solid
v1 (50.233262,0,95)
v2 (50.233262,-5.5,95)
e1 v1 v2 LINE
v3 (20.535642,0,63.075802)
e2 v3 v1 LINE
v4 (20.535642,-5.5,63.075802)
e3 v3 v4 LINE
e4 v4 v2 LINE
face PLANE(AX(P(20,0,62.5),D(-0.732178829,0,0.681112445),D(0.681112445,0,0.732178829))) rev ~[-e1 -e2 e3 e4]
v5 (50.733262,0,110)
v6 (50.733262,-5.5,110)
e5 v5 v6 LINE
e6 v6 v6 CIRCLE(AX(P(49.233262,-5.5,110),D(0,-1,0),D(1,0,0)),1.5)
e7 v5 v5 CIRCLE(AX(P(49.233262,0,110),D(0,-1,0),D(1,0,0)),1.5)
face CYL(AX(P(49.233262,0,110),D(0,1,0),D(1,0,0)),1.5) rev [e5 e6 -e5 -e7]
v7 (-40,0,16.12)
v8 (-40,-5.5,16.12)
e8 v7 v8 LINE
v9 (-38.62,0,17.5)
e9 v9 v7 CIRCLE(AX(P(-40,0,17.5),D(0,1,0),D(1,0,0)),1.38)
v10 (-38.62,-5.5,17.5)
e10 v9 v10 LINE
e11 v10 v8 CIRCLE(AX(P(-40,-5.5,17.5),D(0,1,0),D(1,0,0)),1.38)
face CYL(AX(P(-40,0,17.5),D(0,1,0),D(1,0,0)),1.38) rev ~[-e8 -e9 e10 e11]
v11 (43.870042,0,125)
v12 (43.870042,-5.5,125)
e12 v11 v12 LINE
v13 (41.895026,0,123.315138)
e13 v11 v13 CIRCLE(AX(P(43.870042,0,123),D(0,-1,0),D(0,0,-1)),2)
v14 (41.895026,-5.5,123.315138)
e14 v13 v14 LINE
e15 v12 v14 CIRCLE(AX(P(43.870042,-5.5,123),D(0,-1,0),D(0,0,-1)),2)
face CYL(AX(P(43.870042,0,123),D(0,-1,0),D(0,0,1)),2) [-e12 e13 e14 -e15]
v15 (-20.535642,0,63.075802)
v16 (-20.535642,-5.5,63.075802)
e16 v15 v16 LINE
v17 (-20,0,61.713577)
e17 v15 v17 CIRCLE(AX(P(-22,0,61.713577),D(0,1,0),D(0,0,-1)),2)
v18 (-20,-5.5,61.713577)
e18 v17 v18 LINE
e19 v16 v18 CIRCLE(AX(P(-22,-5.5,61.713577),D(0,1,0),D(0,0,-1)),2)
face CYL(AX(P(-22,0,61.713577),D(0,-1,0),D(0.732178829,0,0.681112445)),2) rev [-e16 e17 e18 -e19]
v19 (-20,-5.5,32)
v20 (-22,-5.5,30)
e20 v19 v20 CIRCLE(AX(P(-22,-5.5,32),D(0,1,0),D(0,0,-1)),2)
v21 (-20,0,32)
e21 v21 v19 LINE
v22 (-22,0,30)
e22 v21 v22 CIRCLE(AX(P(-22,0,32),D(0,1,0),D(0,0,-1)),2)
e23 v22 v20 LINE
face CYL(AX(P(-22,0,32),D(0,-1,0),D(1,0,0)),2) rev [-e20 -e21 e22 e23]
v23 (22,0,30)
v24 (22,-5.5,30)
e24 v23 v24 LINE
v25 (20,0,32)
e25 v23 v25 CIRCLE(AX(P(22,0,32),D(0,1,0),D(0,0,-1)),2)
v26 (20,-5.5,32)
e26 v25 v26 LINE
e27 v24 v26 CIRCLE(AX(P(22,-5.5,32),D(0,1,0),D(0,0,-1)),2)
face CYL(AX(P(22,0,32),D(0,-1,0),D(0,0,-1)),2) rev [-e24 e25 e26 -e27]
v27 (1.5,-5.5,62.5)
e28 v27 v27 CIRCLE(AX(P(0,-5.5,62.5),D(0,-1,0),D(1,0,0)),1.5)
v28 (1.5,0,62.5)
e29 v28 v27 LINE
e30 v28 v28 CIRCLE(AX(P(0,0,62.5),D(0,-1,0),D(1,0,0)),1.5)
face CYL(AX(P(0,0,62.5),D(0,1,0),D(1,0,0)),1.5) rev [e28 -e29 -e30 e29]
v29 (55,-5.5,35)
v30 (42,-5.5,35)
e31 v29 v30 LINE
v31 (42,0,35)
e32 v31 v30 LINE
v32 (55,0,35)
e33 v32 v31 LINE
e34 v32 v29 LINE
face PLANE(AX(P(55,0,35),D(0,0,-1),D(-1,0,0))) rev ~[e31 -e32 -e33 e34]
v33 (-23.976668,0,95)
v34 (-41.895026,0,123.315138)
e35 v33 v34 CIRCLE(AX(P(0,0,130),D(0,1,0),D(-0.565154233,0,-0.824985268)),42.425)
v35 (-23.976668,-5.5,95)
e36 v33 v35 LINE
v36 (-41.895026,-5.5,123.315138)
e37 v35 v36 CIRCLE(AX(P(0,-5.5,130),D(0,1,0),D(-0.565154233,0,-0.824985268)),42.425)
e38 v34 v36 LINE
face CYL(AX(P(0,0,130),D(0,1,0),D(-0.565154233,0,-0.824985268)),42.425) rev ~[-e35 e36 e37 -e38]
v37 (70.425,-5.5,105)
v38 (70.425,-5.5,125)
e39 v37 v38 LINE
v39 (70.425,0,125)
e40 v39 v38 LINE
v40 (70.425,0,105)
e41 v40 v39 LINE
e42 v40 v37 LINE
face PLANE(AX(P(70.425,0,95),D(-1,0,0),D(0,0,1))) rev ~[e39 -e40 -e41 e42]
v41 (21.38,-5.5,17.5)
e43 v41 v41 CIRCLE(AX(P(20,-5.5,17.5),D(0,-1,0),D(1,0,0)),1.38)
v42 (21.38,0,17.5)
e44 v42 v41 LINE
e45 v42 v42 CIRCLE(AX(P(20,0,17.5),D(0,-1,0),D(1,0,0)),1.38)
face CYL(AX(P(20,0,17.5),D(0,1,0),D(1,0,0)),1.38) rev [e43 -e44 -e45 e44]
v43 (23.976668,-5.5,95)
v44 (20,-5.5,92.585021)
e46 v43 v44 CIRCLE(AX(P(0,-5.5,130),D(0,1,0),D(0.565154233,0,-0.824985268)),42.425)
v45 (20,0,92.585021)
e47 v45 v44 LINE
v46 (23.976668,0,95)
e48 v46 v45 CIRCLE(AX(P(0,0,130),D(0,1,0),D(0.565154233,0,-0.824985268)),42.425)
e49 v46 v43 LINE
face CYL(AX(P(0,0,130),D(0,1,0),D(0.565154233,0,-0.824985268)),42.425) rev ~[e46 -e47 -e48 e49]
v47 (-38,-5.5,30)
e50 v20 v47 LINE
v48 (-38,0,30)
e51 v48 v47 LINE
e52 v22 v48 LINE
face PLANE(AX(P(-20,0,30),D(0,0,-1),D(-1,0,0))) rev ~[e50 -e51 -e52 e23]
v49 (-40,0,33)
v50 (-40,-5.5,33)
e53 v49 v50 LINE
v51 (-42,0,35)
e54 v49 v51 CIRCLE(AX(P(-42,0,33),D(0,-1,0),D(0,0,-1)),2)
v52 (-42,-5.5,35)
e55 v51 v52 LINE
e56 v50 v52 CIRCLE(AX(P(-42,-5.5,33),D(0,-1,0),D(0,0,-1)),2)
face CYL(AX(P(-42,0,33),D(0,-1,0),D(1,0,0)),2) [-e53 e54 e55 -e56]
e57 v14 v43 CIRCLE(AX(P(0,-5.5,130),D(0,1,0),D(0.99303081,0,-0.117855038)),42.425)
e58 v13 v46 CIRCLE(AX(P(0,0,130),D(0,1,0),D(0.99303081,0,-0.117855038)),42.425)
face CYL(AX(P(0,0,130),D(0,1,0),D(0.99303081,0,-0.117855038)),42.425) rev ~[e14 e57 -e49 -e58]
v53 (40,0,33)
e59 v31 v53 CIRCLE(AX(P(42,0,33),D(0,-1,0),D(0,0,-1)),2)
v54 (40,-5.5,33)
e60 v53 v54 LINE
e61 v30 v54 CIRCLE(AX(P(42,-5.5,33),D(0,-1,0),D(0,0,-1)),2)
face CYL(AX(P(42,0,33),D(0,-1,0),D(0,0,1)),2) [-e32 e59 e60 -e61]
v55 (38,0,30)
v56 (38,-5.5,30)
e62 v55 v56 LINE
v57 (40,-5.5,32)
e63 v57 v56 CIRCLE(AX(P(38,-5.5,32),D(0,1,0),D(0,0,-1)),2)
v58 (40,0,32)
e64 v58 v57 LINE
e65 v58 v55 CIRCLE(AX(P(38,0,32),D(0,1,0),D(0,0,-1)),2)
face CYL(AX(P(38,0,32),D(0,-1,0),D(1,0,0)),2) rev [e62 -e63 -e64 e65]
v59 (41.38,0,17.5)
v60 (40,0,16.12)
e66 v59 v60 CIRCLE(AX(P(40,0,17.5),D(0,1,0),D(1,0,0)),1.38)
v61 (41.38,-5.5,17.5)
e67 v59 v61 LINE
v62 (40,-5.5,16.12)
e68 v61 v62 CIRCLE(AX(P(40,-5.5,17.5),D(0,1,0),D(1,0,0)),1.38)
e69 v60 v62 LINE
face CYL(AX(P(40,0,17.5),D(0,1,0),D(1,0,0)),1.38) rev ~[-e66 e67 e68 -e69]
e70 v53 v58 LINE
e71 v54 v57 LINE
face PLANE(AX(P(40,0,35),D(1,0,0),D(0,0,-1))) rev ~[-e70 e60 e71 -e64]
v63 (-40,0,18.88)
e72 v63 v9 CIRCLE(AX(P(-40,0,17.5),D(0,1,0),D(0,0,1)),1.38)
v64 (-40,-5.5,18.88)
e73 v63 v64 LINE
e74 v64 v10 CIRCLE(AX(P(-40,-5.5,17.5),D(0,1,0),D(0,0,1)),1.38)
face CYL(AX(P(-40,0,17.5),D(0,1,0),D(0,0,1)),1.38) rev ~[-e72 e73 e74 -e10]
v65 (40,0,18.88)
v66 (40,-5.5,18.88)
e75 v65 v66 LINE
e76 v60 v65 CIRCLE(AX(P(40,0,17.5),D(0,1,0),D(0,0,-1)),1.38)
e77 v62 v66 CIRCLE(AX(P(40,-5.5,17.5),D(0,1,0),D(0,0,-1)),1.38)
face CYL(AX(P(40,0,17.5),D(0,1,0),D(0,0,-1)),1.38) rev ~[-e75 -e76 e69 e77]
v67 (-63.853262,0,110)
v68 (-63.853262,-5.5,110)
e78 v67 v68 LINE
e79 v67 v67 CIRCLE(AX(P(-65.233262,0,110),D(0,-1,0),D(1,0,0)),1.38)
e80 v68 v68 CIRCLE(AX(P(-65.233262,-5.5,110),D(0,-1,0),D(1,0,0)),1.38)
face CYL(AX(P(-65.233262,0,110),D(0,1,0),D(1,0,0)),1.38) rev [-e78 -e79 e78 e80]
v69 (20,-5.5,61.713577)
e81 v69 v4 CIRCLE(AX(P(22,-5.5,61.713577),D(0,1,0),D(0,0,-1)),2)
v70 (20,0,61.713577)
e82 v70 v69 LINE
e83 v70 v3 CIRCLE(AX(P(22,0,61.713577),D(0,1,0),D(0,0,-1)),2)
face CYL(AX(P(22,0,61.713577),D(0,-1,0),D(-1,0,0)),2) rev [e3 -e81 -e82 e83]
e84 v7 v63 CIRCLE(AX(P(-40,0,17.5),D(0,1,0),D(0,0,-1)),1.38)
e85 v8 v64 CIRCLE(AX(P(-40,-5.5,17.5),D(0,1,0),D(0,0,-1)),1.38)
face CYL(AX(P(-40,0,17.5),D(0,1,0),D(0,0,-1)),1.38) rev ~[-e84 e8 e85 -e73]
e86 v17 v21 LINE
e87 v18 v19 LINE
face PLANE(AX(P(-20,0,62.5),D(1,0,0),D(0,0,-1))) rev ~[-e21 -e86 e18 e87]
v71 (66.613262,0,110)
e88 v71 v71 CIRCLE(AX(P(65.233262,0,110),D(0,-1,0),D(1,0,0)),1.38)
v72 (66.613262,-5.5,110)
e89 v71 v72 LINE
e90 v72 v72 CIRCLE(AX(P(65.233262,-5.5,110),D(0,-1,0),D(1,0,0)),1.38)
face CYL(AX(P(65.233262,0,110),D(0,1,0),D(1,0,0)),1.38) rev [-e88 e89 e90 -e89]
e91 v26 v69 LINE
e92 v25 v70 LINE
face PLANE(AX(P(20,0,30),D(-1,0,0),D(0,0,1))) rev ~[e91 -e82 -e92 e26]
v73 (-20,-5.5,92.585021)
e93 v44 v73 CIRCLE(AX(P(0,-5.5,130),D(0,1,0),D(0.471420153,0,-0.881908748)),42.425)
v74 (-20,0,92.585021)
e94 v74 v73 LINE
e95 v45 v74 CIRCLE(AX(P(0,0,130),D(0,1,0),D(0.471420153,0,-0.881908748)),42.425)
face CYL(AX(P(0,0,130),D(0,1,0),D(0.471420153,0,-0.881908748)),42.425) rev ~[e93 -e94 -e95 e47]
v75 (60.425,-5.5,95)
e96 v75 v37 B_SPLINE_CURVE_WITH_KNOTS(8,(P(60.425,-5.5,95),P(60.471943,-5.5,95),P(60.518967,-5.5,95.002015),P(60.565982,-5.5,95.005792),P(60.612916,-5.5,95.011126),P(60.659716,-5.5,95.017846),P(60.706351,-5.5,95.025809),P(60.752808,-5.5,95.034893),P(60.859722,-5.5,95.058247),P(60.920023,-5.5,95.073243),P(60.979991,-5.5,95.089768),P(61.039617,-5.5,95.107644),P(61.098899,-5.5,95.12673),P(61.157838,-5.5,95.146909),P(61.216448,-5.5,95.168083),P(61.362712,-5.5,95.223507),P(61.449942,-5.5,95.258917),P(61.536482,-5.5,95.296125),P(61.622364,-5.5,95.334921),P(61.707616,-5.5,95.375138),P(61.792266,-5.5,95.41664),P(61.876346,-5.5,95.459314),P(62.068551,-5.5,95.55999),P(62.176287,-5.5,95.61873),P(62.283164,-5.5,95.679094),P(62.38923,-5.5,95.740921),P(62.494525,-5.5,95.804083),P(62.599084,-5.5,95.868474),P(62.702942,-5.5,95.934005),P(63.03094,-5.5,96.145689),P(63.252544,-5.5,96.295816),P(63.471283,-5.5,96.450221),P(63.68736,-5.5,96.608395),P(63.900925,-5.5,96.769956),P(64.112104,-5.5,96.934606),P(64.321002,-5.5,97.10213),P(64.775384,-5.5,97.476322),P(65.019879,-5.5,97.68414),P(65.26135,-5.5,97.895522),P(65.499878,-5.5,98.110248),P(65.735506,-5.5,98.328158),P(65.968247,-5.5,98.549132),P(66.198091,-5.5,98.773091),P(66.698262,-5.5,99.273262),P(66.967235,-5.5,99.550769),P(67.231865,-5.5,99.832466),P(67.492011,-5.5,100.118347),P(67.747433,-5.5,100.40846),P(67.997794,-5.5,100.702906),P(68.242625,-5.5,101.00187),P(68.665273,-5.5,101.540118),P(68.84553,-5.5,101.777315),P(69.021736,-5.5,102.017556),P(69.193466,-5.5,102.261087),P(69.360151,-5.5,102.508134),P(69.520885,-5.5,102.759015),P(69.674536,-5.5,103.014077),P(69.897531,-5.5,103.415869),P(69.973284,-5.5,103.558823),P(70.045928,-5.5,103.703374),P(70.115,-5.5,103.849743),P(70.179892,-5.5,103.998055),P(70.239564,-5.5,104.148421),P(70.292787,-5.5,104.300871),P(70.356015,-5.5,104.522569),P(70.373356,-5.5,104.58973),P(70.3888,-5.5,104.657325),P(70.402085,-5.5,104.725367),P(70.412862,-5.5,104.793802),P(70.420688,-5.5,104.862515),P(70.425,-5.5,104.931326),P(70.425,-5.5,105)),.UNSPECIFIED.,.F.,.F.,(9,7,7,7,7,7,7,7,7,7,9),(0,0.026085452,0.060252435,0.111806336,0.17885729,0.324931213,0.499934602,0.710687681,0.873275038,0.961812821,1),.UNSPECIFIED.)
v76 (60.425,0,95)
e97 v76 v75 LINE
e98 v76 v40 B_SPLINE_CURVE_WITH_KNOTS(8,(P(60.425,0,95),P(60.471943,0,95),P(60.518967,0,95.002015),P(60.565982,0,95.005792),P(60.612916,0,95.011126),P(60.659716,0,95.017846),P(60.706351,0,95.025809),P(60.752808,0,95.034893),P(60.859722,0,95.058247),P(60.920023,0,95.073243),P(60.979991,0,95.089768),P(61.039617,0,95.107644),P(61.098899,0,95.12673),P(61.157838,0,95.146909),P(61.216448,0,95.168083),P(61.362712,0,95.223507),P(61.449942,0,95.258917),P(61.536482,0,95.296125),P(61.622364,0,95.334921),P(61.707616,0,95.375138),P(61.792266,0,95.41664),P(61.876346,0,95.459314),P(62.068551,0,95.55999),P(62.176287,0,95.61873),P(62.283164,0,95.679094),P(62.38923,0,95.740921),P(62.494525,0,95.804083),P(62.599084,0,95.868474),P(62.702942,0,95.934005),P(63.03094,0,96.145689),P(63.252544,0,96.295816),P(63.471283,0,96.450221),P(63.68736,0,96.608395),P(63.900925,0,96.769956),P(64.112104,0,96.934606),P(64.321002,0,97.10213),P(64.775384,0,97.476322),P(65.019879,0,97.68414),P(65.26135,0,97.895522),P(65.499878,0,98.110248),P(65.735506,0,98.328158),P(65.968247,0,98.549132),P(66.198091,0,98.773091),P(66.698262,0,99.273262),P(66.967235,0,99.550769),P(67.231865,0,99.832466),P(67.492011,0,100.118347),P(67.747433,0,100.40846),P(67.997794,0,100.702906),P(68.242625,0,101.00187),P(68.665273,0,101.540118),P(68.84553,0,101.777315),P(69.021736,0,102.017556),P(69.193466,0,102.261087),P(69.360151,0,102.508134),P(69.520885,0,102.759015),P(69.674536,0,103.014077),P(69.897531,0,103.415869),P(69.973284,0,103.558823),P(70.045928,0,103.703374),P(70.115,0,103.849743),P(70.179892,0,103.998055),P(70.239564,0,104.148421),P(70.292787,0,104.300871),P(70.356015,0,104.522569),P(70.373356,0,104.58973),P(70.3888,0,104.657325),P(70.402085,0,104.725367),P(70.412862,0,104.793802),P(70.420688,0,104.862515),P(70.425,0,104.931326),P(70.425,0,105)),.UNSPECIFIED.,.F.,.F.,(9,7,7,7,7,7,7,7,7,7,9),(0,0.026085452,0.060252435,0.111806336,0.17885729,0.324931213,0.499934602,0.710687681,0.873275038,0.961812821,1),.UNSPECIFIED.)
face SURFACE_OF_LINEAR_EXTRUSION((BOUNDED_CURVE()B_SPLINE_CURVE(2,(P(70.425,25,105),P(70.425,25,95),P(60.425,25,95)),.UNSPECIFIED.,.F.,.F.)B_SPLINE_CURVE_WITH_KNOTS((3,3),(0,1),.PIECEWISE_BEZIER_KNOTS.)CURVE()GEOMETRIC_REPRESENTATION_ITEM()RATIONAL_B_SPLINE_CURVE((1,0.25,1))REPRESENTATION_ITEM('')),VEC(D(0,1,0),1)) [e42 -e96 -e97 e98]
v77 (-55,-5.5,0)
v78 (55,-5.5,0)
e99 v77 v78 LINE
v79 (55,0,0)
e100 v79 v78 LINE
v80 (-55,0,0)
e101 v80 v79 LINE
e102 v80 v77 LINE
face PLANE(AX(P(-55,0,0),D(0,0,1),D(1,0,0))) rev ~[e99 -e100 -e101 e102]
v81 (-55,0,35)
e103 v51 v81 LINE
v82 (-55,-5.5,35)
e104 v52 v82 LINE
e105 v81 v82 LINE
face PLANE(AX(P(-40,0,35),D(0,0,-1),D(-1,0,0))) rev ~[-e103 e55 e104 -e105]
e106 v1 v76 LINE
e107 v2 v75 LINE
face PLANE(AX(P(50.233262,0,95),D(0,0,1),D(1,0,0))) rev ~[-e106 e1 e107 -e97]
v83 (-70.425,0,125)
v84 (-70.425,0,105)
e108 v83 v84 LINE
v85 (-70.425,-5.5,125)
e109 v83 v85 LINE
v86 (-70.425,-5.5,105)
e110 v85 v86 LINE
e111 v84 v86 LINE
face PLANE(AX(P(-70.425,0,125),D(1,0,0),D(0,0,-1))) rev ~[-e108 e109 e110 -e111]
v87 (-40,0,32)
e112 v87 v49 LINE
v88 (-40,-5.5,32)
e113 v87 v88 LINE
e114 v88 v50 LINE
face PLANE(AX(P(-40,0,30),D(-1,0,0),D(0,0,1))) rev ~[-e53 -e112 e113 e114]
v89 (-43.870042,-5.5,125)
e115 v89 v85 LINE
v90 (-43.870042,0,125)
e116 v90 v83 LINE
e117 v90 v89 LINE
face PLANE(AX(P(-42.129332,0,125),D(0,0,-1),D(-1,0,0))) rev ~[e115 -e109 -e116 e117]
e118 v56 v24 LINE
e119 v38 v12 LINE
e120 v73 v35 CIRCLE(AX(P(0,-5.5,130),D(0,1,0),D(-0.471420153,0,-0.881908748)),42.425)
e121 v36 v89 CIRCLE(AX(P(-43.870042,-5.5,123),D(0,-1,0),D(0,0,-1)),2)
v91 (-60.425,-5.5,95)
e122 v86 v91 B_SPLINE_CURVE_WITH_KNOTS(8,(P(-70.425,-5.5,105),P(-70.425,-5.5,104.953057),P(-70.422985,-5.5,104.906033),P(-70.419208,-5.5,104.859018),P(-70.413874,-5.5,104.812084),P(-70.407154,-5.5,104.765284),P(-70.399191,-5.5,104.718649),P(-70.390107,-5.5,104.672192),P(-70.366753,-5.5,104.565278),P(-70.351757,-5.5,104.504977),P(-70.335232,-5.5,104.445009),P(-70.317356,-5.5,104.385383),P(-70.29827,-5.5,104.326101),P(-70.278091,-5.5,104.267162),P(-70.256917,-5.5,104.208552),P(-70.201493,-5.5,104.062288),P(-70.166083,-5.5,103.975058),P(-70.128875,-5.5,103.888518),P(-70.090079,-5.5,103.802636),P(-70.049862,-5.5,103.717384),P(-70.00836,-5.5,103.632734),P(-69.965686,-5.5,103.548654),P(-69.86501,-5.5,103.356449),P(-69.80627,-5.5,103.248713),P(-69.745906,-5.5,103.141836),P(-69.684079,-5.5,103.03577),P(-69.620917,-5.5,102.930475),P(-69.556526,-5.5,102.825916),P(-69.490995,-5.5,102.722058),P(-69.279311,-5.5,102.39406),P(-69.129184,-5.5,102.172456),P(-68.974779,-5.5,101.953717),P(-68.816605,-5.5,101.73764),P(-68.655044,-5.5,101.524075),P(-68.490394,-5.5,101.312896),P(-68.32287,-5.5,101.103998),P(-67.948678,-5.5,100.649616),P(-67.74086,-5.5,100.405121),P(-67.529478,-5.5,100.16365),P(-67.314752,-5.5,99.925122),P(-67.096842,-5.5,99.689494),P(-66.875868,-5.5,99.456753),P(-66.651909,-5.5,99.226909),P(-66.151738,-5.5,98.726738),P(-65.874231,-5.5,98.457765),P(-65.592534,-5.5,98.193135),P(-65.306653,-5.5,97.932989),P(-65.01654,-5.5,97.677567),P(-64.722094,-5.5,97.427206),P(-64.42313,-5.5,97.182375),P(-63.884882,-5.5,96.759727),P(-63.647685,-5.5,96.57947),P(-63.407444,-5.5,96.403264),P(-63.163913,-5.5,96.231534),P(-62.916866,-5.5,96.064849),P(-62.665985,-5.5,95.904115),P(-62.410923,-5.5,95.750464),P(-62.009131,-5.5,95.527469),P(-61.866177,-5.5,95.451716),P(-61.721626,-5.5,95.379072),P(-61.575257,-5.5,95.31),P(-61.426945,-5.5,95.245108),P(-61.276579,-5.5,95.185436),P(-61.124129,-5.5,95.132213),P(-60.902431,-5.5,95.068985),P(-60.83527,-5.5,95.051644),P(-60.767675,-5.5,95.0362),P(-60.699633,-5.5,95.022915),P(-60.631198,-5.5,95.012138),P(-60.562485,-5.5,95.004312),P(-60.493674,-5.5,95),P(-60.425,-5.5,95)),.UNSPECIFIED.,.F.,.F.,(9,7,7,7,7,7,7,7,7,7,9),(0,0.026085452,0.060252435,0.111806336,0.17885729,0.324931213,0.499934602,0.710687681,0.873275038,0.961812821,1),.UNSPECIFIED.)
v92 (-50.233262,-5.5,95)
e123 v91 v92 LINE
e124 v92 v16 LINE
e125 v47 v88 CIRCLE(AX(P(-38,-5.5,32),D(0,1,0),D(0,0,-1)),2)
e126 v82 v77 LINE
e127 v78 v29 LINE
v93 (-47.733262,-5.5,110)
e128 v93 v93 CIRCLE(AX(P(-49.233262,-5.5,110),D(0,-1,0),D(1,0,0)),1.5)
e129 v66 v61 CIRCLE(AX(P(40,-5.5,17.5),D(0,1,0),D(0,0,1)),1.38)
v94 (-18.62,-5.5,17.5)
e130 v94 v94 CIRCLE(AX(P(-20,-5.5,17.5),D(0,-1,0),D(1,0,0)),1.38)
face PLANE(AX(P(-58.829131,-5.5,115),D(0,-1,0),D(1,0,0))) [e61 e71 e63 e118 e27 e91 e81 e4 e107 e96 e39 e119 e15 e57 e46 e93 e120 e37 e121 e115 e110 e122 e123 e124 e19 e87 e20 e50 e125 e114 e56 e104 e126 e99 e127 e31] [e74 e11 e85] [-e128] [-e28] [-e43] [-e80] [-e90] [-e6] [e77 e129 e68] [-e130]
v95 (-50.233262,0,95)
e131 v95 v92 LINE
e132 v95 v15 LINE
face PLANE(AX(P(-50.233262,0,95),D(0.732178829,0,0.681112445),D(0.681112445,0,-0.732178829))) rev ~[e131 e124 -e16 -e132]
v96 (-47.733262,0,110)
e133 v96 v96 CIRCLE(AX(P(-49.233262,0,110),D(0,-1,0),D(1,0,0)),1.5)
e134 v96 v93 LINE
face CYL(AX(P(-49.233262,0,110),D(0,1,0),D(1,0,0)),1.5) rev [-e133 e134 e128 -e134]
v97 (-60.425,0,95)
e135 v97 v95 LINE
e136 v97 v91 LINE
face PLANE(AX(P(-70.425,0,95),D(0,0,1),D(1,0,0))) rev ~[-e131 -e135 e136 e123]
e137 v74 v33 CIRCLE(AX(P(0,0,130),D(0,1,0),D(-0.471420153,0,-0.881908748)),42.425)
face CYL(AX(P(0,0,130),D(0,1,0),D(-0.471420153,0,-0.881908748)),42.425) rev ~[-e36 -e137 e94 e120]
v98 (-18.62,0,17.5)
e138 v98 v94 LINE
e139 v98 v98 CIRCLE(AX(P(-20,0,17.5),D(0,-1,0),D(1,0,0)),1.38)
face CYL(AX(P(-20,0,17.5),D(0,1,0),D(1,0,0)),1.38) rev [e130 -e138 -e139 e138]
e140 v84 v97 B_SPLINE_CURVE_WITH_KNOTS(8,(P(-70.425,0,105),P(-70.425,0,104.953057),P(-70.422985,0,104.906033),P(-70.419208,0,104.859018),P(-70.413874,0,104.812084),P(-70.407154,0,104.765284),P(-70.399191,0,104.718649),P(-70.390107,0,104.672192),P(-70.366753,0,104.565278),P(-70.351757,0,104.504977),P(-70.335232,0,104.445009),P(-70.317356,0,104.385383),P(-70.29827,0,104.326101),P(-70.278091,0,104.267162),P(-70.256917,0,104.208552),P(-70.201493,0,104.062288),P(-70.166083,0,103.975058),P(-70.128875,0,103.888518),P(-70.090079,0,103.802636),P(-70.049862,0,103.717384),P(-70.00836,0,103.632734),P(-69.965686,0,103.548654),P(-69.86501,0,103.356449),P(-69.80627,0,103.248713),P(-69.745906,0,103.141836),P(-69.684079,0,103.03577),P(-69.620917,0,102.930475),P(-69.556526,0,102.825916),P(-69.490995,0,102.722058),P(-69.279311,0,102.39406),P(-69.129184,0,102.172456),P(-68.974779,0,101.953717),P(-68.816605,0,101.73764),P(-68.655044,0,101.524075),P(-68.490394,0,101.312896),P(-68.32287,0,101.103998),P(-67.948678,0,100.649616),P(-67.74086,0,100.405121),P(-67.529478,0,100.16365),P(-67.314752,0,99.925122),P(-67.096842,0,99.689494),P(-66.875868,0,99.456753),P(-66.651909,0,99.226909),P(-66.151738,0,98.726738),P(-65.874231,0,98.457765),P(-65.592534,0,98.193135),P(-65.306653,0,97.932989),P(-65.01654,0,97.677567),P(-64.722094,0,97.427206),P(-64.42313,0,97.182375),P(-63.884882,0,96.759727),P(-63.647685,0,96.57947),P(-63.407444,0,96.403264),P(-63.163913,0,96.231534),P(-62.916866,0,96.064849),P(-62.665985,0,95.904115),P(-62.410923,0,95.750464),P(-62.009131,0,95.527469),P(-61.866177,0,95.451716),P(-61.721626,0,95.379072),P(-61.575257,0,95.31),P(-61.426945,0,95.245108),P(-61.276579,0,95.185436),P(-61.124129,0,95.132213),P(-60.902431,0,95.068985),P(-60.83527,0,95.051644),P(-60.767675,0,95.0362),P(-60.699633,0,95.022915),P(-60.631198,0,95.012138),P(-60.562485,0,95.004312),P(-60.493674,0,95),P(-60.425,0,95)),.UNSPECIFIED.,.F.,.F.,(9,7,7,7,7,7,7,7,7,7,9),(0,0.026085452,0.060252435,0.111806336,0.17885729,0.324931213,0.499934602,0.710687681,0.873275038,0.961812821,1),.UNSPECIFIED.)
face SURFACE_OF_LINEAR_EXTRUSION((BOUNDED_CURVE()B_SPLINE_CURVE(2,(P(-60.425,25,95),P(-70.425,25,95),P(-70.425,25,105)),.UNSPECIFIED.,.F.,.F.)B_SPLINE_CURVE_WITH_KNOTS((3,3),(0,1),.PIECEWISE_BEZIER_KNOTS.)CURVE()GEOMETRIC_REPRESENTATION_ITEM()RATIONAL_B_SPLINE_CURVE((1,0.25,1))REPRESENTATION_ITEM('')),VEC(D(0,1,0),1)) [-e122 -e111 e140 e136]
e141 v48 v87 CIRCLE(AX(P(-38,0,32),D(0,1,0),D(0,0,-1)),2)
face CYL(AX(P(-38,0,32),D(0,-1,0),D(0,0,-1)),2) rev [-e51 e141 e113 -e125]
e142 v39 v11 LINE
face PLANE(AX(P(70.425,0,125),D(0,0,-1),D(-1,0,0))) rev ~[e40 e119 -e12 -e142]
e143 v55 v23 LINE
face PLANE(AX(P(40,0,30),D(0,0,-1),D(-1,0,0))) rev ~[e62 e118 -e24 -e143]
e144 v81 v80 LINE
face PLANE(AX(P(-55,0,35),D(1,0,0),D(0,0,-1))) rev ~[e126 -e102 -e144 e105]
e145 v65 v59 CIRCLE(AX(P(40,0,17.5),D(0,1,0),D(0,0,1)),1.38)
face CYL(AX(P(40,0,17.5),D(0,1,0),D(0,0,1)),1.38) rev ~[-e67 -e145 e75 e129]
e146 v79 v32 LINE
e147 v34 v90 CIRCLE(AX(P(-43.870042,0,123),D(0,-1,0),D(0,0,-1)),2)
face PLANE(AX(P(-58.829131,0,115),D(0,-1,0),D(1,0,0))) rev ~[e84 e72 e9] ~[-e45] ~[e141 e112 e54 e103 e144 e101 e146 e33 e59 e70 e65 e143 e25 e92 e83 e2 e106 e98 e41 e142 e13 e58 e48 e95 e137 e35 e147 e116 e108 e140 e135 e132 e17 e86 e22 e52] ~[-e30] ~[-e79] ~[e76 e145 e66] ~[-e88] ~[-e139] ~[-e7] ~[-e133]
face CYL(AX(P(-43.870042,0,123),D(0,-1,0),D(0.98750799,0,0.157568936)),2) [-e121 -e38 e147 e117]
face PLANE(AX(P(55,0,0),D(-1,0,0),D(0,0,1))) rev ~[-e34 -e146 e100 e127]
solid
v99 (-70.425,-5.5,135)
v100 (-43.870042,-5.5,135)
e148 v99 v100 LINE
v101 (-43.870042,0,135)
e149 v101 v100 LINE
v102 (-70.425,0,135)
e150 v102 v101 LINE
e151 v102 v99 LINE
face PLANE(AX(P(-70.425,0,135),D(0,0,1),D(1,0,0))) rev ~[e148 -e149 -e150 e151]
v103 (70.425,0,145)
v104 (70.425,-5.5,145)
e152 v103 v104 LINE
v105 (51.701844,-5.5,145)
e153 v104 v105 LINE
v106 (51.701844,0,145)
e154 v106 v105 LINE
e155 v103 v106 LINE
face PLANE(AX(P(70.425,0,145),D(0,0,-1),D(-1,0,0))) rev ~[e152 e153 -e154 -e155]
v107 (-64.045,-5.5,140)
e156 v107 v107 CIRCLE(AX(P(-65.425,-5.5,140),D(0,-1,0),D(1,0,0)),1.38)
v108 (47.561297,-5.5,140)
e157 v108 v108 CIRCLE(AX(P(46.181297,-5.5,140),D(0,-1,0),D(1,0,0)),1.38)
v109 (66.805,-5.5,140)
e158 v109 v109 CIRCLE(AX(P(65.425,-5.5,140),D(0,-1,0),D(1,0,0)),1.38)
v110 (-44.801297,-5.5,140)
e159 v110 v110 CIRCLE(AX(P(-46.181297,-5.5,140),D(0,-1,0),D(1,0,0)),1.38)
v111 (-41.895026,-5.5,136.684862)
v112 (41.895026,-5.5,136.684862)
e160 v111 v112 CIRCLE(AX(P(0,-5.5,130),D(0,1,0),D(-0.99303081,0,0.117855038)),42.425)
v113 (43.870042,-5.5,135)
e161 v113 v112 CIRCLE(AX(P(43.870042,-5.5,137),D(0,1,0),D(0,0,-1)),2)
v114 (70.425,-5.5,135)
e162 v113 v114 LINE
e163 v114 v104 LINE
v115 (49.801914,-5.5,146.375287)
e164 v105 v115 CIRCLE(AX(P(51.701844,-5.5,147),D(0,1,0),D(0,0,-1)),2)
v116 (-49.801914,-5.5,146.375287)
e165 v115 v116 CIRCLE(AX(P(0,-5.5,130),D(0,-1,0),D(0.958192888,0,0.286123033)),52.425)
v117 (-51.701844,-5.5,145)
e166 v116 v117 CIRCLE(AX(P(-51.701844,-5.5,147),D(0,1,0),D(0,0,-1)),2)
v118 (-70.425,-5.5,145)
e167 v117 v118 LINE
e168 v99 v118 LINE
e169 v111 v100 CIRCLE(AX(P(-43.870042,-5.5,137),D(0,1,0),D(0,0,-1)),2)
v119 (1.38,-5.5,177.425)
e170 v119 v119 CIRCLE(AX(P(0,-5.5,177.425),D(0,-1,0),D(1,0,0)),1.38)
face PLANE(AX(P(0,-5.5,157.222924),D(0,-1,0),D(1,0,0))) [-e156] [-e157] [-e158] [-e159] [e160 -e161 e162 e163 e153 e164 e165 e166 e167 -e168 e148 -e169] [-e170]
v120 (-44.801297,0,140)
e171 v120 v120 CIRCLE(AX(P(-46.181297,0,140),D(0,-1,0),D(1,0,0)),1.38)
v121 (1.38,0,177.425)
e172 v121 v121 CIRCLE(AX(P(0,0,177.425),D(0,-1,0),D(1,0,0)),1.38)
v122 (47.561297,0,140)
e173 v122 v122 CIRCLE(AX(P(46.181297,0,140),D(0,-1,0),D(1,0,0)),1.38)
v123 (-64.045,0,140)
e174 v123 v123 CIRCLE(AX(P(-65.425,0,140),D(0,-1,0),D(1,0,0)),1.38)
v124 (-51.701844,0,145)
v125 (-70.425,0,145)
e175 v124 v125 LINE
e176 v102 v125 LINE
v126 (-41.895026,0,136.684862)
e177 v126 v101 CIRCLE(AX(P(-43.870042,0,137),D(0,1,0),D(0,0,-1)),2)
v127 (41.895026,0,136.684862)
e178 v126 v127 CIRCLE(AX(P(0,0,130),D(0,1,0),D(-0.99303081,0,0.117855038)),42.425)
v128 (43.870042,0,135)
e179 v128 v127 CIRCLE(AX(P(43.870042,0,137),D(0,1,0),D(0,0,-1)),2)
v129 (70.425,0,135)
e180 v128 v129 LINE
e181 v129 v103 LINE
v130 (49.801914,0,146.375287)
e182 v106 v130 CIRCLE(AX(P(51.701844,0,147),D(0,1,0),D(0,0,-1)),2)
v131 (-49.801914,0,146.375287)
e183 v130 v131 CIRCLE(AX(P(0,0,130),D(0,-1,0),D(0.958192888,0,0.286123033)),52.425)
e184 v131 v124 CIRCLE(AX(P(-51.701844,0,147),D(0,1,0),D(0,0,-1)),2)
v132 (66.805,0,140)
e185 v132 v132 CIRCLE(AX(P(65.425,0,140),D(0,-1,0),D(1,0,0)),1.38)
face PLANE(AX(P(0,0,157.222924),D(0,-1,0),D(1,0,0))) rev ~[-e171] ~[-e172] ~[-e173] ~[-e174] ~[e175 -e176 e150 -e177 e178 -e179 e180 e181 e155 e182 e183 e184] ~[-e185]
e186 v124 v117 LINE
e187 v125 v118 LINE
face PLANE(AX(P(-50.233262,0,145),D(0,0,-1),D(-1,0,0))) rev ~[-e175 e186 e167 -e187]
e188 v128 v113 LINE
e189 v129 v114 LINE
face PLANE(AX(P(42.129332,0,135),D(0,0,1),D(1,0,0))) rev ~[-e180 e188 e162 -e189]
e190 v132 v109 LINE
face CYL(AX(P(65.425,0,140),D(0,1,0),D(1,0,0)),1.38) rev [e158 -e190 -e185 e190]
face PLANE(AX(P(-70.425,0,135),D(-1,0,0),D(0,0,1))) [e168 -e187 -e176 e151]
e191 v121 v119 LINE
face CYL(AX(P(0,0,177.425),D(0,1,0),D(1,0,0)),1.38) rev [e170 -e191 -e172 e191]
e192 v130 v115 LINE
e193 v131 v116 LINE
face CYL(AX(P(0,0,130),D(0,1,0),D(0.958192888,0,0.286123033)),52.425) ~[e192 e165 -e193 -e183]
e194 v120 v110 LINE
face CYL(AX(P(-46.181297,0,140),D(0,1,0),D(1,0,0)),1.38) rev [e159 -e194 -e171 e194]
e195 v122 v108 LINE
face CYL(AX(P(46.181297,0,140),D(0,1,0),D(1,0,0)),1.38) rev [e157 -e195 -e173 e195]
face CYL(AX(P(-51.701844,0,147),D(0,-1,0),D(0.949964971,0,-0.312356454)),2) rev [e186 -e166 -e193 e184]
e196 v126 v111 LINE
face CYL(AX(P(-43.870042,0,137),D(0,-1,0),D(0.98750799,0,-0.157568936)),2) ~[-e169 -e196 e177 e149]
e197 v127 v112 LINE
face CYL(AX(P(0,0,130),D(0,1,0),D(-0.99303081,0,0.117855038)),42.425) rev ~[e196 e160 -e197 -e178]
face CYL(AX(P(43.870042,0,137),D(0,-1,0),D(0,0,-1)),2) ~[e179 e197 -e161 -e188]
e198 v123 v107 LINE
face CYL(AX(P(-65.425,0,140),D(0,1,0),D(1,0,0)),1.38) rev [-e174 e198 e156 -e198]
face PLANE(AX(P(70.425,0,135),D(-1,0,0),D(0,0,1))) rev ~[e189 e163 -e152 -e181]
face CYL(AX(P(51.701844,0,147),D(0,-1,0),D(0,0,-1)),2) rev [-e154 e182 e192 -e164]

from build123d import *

# Parameters (mm, degrees)
F0_W        = 3.1917378622
F0_H        = 20
F0_R        = 1.5
F0_W_2      = 4.8082621378
F0_R_2      = 1.38
F0_H_2      = 10
F1_DEPTH    = 5.5
F0_W_3      = 10
F2_R        = 2
F2_2_R      = 2
F3_T1_DEPTH = 55.5


# Not quite as in the source:
# - a fillet or chamfer that OpenCascade refuses, or shapes differently, is made with other operations: its cross-section is extruded or revolved along the edge and cut away or added


with BuildPart() as f1:
    # F0 (on Front) → F1 (new body)
    with BuildSketch(Plane.XZ):
        with Locations((-58.8291310689, 115)):
            Rectangle(F0_W, F0_H)
        with BuildLine():
            Line((-52.425, 95), (-50.2332621378, 95))
            Line((-50.2332621378, 95), (-23.9766683465, 95))
            ThreePointArc((-23.9766683465, 95), (-36.2973941829, 108.0368535831), (-42.1293321215, 125))
            Line((-42.1293321215, 125), (-52.425, 125))
            Line((-52.425, 125), (-52.425, 105))
            Line((-52.425, 105), (-52.425, 95))
        make_face()
        with Locations((-49.2332621378, 110)):
            Circle(F0_R, mode=Mode.SUBTRACT)
        with Locations((58.8291310689, 115)):
            Rectangle(F0_W, F0_H)
        with Locations((54.8291310689, 115)):
            Rectangle(F0_W_2, F0_H)
        with BuildLine():
            Line((-20, 62.5), (-20, 30))
            Line((-20, 30), (20, 30))
            Line((20, 30), (20, 62.5))
            Line((20, 62.5), (20, 92.5850213818))
            ThreePointArc((20, 92.5850213818), (0, 87.575), (-20, 92.5850213818))
            Line((-20, 92.5850213818), (-20, 62.5))
        make_face()
        with Locations((0, 62.5)):
            Circle(F0_R, mode=Mode.SUBTRACT)
        Polygon((-30, 30), (-30, 0), (30, 0), (30, 30), (20, 30), (-20, 30), align=None)
        with Locations((-20, 17.5)):
            Circle(F0_R_2, mode=Mode.SUBTRACT)
        with Locations((20, 17.5)):
            Circle(F0_R_2, mode=Mode.SUBTRACT)
        Polygon((-70.425, 95), (-60.425, 95), (-60.425, 105), (-60.425, 125), (-70.425, 125), align=None)
        with Locations((-65.2332621378, 110)):
            Circle(F0_R_2, mode=Mode.SUBTRACT)
        with Locations((-58.8291310689, 100)):
            Rectangle(F0_W, F0_H_2)
        with Locations((-54.8291310689, 100)):
            Rectangle(F0_W_2, F0_H_2)
        with Locations((54.8291310689, 100)):
            Rectangle(F0_W_2, F0_H_2)
        with Locations((58.8291310689, 100)):
            Rectangle(F0_W, F0_H_2)
        Polygon((60.425, 105), (60.425, 95), (70.425, 95), (70.425, 125), (60.425, 125), align=None)
        with Locations((65.2332621378, 110)):
            Circle(F0_R_2, mode=Mode.SUBTRACT)
        with BuildLine():
            Line((-40, 16.12), (-40, 0))
            Line((-40, 0), (-30, 0))
            Line((-30, 0), (-30, 30))
            Line((-30, 30), (-40, 30))
            Line((-40, 30), (-40, 18.88))
            ThreePointArc((-40, 18.88), (-39.024192642, 18.475807358), (-38.62, 17.5))
            ThreePointArc((-38.62, 17.5), (-39.024192642, 16.524192642), (-40, 16.12))
        make_face()
        with BuildLine():
            Line((-55, 0), (-40, 0))
            Line((-40, 0), (-40, 16.12))
            ThreePointArc((-40, 16.12), (-41.38, 17.5), (-40, 18.88))
            Line((-40, 18.88), (-40, 30))
            Line((-40, 30), (-40, 35))
            Line((-40, 35), (-55, 35))
            Line((-55, 35), (-55, 0))
        make_face()
        with BuildLine():
            Line((40, 16.12), (40, 0))
            Line((40, 0), (55, 0))
            Line((55, 0), (55, 35))
            Line((55, 35), (40, 35))
            Line((40, 35), (40, 30))
            Line((40, 30), (40, 18.88))
            ThreePointArc((40, 18.88), (40.975807358, 18.475807358), (41.38, 17.5))
            ThreePointArc((41.38, 17.5), (40.975807358, 16.524192642), (40, 16.12))
        make_face()
        with BuildLine():
            Line((30, 30), (30, 0))
            Line((30, 0), (40, 0))
            Line((40, 0), (40, 16.12))
            ThreePointArc((40, 16.12), (38.62, 17.5), (40, 18.88))
            Line((40, 18.88), (40, 30))
            Line((40, 30), (30, 30))
        make_face()
        with BuildLine():
            Line((20, 92.5850213818), (20, 62.5))
            Line((20, 62.5), (50.2332621378, 95))
            Line((50.2332621378, 95), (23.9766683465, 95))
            ThreePointArc((23.9766683465, 95), (22.0214638511, 93.7379571059), (20, 92.5850213818))
        make_face()
        with BuildLine():
            Line((-50.2332621378, 95), (-20, 62.5))
            Line((-20, 62.5), (-20, 92.5850213818))
            ThreePointArc((-20, 92.5850213818), (-22.0214638511, 93.7379571059), (-23.9766683465, 95))
            Line((-23.9766683465, 95), (-50.2332621378, 95))
        make_face()
        with BuildLine():
            Line((23.9766683465, 95), (50.2332621378, 95))
            Line((50.2332621378, 95), (52.425, 95))
            Line((52.425, 95), (52.425, 105))
            Line((52.425, 105), (52.425, 125))
            Line((52.425, 125), (42.1293321215, 125))
            ThreePointArc((42.1293321215, 125), (36.2973941829, 108.0368535831), (23.9766683465, 95))
        make_face()
        with Locations((49.2332621378, 110)):
            Circle(F0_R, mode=Mode.SUBTRACT)
        with Locations((-54.8291310689, 115)):
            Rectangle(F0_W_2, F0_H)
    extrude(amount=F1_DEPTH)

    # F2
    f2_edges = [f1.edges().sort_by_distance(p)[0] for p in [
        (-40, -2.75, 30),
        (-40, -2.75, 35),
        (-20, -2.75, 30),
        (20, -2.75, 30),
        (40, -2.75, 30),
        (40, -2.75, 35),
        (-42.129332, -2.75, 125),
        (42.129332, -2.75, 125),
        (-20, -2.75, 62.5),
        (20, -2.75, 62.5),
    ]]
    fillet(f2_edges, radius=F2_R)

    # F3: fillet of radius 10 on 2 edges, made by hand

    # F3_s2 → F3_t1 (cut)
    with BuildSketch(Plane.XZ.offset(-25)):
        with BuildLine():
            add(Edge.make_bspline(
                [(-60.425, 95), (-70.425, 95), (-70.425, 105)],
                knots=[0, 0, 0, 1, 1, 1], degree=2, weights=[1, 0.25, 1]))
            Line((-70.425, 105), (-70.425, 95))
            Line((-70.425, 95), (-60.425, 95))
        make_face()
        with BuildLine():
            add(Edge.make_bspline(
                [(70.425, 105), (70.425, 95), (60.425, 95)],
                knots=[0, 0, 0, 1, 1, 1], degree=2, weights=[1, 0.25, 1]))
            Line((60.425, 95), (70.425, 95))
            Line((70.425, 95), (70.425, 105))
        make_face()
    extrude(amount=F3_T1_DEPTH, mode=Mode.SUBTRACT)


with BuildPart() as f1b:
    # F0 (on Front) → F1, piece 2 (new body)
    with BuildSketch(Plane.XZ):
        with BuildLine():
            Line((42.1293321215, 135), (57.2332621378, 135))
            Line((57.2332621378, 135), (57.2332621378, 145))
            Line((57.2332621378, 145), (50.2332621378, 145))
            ThreePointArc((50.2332621378, 145), (0, 182.425), (-50.2332621378, 145))
            Line((-50.2332621378, 145), (-57.2332621378, 145))
            Line((-57.2332621378, 145), (-57.2332621378, 135))
            Line((-57.2332621378, 135), (-42.1293321215, 135))
            ThreePointArc((-42.1293321215, 135), (0, 172.425), (42.1293321215, 135))
        make_face()
        with Locations((-46.1812971296, 140)):
            Circle(F0_R_2, mode=Mode.SUBTRACT)
        with Locations((0, 177.425)):
            Circle(F0_R_2, mode=Mode.SUBTRACT)
        with Locations((46.1812971296, 140)):
            Circle(F0_R_2, mode=Mode.SUBTRACT)
        with Locations((58.8291310689, 140)):
            Rectangle(F0_W, F0_H_2)
        with Locations((-58.8291310689, 140)):
            Rectangle(F0_W, F0_H_2)
        with Locations((-65.425, 140)):
            Rectangle(F0_W_3, F0_H_2)
        with Locations((-65.425, 140)):
            Circle(F0_R_2, mode=Mode.SUBTRACT)
        with Locations((65.425, 140)):
            Rectangle(F0_W_3, F0_H_2)
        with Locations((65.425, 140)):
            Circle(F0_R_2, mode=Mode.SUBTRACT)
    extrude(amount=F1_DEPTH)

    # F2#2
    f2_2_edges = [f1b.edges().sort_by_distance(p)[0] for p in [
        (-50.233262, -2.75, 145),
        (50.233262, -2.75, 145),
        (-42.129332, -2.75, 135),
        (42.129332, -2.75, 135),
    ]]
    fillet(f2_2_edges, radius=F2_2_R)


solid = Compound([f1.part, f1b.part])
